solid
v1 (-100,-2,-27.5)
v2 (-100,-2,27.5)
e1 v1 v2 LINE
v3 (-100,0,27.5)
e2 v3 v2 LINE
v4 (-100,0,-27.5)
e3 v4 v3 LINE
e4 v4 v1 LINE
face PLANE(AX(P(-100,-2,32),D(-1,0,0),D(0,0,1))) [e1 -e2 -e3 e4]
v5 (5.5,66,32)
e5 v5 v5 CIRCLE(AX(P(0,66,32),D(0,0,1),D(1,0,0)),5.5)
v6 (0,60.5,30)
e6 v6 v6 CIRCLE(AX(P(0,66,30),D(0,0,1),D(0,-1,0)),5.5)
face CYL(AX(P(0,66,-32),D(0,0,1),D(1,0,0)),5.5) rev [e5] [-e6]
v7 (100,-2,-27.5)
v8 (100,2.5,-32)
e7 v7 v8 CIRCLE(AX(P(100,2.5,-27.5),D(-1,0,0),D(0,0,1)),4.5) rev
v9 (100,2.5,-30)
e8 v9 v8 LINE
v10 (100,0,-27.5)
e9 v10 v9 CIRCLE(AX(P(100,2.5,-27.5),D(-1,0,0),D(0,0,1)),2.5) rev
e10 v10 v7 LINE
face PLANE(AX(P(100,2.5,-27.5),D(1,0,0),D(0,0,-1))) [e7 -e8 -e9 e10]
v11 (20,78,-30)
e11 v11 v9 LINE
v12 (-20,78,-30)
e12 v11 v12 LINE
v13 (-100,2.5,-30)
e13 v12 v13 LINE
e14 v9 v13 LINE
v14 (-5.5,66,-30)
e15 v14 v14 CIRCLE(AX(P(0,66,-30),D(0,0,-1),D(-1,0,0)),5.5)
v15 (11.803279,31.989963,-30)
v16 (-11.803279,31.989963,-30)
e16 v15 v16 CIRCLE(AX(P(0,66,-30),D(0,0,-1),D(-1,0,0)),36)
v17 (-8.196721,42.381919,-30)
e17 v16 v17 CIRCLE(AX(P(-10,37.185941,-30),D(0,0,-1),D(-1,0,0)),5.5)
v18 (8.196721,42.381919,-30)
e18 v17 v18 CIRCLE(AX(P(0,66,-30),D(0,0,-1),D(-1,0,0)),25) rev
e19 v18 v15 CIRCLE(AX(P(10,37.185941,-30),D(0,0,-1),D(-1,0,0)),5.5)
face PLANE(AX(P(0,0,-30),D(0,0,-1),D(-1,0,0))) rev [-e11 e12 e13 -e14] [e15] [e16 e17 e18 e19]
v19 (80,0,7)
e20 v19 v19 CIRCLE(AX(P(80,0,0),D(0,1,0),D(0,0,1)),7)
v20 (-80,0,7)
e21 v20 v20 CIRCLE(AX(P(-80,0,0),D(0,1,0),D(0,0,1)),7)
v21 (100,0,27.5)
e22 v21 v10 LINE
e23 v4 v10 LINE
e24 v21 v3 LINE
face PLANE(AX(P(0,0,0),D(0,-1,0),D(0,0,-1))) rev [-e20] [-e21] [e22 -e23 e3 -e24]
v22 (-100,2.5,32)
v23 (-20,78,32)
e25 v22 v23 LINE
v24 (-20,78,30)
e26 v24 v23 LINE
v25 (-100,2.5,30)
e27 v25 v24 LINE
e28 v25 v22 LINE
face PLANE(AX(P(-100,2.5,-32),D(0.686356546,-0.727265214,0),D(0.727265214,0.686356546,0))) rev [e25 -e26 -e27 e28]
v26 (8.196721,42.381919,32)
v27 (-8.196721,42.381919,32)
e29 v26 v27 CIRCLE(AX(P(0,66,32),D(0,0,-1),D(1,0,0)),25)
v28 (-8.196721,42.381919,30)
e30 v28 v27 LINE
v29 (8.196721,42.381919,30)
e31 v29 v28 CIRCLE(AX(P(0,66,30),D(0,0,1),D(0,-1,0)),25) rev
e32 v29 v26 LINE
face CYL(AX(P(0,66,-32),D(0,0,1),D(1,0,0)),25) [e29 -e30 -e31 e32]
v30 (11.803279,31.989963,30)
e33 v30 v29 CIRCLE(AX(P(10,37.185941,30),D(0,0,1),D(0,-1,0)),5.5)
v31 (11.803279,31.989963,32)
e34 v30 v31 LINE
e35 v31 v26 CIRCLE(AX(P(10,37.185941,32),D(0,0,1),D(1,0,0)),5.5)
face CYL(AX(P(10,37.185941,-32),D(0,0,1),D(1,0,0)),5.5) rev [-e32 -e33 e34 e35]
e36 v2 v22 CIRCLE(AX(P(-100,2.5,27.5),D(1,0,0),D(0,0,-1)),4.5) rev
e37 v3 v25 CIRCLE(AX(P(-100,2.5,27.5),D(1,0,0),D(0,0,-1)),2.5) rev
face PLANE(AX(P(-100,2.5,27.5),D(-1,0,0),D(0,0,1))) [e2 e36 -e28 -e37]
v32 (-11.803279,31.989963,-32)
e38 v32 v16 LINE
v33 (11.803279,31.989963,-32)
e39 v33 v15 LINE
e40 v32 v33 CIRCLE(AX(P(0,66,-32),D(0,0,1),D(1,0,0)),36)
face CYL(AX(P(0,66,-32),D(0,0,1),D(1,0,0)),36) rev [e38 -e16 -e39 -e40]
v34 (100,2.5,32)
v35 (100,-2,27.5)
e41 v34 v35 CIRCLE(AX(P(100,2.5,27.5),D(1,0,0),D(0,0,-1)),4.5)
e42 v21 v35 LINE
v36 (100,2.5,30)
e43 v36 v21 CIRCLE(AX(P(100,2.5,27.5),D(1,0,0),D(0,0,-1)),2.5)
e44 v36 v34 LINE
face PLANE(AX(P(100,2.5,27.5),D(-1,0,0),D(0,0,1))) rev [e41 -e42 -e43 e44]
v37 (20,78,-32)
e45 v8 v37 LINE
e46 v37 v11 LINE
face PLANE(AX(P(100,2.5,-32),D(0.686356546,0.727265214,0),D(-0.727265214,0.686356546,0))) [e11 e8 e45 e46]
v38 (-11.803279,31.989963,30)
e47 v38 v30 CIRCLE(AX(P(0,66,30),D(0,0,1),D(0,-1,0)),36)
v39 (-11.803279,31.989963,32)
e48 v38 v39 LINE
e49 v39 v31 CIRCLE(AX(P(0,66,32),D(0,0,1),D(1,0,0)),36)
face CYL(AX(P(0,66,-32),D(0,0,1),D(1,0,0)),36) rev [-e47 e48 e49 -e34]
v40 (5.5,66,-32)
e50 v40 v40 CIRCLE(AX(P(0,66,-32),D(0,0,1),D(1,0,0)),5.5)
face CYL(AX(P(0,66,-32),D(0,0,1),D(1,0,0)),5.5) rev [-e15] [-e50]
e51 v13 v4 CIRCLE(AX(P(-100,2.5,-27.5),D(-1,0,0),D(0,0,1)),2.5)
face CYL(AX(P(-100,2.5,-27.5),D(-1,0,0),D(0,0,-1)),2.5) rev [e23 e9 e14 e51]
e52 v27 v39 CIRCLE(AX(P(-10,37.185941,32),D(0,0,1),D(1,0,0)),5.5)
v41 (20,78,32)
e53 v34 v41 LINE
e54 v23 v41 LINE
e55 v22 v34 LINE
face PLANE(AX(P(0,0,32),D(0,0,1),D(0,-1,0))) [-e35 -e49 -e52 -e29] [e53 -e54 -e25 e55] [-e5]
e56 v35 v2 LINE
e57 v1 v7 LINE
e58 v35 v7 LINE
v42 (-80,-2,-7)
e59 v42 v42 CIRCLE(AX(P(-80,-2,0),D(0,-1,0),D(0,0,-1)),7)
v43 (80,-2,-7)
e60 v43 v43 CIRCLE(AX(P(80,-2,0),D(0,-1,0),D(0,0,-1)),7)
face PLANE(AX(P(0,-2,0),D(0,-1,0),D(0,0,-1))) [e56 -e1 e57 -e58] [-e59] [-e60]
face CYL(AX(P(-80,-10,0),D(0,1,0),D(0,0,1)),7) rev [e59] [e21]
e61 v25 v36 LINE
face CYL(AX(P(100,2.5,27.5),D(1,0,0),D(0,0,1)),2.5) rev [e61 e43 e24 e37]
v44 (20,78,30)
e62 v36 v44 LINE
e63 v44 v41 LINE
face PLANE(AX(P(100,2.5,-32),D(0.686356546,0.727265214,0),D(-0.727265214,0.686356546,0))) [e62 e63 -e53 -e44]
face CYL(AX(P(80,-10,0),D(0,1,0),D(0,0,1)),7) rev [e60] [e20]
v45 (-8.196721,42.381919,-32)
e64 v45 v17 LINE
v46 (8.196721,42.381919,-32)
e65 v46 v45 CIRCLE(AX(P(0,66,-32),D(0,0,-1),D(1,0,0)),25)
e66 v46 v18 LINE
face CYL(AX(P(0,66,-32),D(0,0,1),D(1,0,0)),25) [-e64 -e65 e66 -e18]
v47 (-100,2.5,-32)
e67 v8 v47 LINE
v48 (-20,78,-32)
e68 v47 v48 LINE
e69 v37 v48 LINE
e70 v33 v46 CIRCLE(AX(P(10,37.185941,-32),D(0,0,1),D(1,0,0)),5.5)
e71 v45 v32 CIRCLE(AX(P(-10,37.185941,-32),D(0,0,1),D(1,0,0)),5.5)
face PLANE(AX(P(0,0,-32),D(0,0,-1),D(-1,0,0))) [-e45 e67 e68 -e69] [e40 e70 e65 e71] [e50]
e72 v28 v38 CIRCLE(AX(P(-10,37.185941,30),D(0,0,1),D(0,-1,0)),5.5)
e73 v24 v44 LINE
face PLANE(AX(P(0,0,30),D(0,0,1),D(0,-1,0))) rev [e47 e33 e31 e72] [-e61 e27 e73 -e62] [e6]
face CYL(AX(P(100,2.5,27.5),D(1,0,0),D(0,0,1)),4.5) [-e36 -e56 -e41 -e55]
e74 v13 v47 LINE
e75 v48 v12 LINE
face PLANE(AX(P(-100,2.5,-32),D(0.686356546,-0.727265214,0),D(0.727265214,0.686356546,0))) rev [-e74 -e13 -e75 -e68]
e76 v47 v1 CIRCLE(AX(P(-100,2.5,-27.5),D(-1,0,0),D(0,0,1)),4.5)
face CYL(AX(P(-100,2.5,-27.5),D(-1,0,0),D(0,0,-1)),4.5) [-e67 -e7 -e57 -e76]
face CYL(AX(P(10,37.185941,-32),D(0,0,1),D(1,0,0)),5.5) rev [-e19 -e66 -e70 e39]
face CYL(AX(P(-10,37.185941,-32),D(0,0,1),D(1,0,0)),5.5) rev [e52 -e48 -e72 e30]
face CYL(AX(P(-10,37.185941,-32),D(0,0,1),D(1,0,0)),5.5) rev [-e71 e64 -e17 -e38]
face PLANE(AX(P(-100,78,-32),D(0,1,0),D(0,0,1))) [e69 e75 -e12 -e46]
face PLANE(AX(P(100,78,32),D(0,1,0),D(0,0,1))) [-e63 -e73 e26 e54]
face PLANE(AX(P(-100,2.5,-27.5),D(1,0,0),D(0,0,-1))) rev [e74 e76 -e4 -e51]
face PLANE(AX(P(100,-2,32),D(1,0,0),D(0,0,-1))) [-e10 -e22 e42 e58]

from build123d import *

# Parameters (mm, degrees)
SKETCH9_W                      = 200
SKETCH9_H                      = 64
BASE_FLANGE2_DEPTH             = 2
EDGE_FLANGE2_STRIP_W           = 13
EDGE_FLANGE2_STRIP_H           = 2
EDGE_FLANGE2_STRIP_CUT_DEPTH   = 200
EDGE_FLANGE2_STRIP_2_W         = 13
EDGE_FLANGE2_STRIP_2_H         = 2
EDGE_FLANGE2_STRIP_CUT_2_DEPTH = 200
EDGE_FLANGE2_DEPTH             = 200
EDGE_FLANGE2_BEND_DEPTH        = 200
CUT_EXTRUDE1_DEPTH             = 143.056326857
SKETCH21_R                     = 5.5
CUT_EXTRUDE2_DEPTH             = 143.056326857
CUT_EXTRUDE3_DEPTH             = 143.056326857
SKETCH23_R                     = 7
CUT_EXTRUDE4_DEPTH             = 10


# Sheet-metal steps are written as plain solids
with BuildPart() as part:
    # Sketch9 → Base-Flange2 (new body)
    with BuildSketch(Plane(origin=(0, 0, 0), x_dir=(1, 0, 0), z_dir=(0, 1, 0))):
        Rectangle(SKETCH9_W, SKETCH9_H)
    extrude(amount=-BASE_FLANGE2_DEPTH)

    # Edge-Flange2 strip (across the edge) → Edge-Flange2 strip cut (cut)
    with BuildSketch(Plane(origin=(-100, 0, 32), x_dir=(0, 0, -1), z_dir=(1, 0, 0))):
        with Locations((-2, -1)):
            Rectangle(EDGE_FLANGE2_STRIP_W, EDGE_FLANGE2_STRIP_H)
    extrude(amount=EDGE_FLANGE2_STRIP_CUT_DEPTH, mode=Mode.SUBTRACT)

    # Edge-Flange2 strip 2 (across the edge) → Edge-Flange2 strip cut 2 (cut)
    with BuildSketch(Plane(origin=(100, 0, -32), x_dir=(0, 0, 1), z_dir=(-1, 0, 0))):
        with Locations((-2, -1)):
            Rectangle(EDGE_FLANGE2_STRIP_2_W, EDGE_FLANGE2_STRIP_2_H)
    extrude(amount=EDGE_FLANGE2_STRIP_CUT_2_DEPTH, mode=Mode.SUBTRACT)

    # Edge-Flange2 section (across the edge) → Edge-Flange2 (add)
    with BuildSketch(Plane(origin=(-100, 0, 32), x_dir=(0, 0, -1), z_dir=(1, 0, 0))):
        with BuildLine():
            Line((0, 2.5), (0, 78))
            Line((0, 78), (2, 78))
            Line((2, 78), (2, 2.5))
            ThreePointArc((2, 2.5), (2.732233047, 0.732233047), (4.5, 0))
            Line((4.5, 0), (4.5, -2))
            ThreePointArc((4.5, -2), (1.318019485, -0.681980515), (0, 2.5))
        make_face()
    extrude(amount=EDGE_FLANGE2_DEPTH)

    # Edge-Flange2 section 2 (across the edge) → Edge-Flange2 bend (add)
    with BuildSketch(Plane(origin=(100, 0, -32), x_dir=(0, 0, 1), z_dir=(-1, 0, 0))):
        with BuildLine():
            Line((0, 2.5), (0, 78))
            Line((0, 78), (2, 78))
            Line((2, 78), (2, 2.5))
            ThreePointArc((2, 2.5), (2.732233047, 0.732233047), (4.5, 0))
            Line((4.5, 0), (4.5, -2))
            ThreePointArc((4.5, -2), (1.318019485, -0.681980515), (0, 2.5))
        make_face()
    extrude(amount=EDGE_FLANGE2_BEND_DEPTH)

    # Sketch20 → Cut-Extrude1 (cut, through all)
    with BuildSketch(Plane.XY.offset(32)):
        Polygon((-100, 2.5), (-20, 78), (-100, 78), align=None)
    cut_extrude1 = extrude(amount=-CUT_EXTRUDE1_DEPTH, mode=Mode.SUBTRACT)

    # Mirror1: Cut-Extrude1 across plane
    add(cut_extrude1.mirror(Plane(origin=(0, 0, 0), x_dir=(0, 0, 1), z_dir=(1, 0, 0))), mode=Mode.SUBTRACT)

    # Sketch21 → Cut-Extrude2 (cut, through all)
    with BuildSketch(Plane.XY.offset(32)):
        with Locations((0, 66)):
            Circle(SKETCH21_R)
    extrude(amount=-CUT_EXTRUDE2_DEPTH, mode=Mode.SUBTRACT)

    # Sketch22 → Cut-Extrude3 (cut, through all)
    with BuildSketch(Plane.XY.offset(32)):
        with BuildLine():
            ThreePointArc((-11.803278689, 31.989963067), (0, 30), (11.803278689, 31.989963067))
            ThreePointArc((11.803278689, 31.989963067), (15.195977865, 38.98921962), (8.196721311, 42.381918796))
            ThreePointArc((8.196721311, 42.381918796), (0, 41), (-8.196721311, 42.381918796))
            ThreePointArc((-8.196721311, 42.381918796), (-15.195977865, 38.98921962), (-11.803278689, 31.989963067))
        make_face()
    extrude(amount=-CUT_EXTRUDE3_DEPTH, mode=Mode.SUBTRACT)

    # Sketch23 → Cut-Extrude4 (cut)
    with BuildSketch(Plane(origin=(0, 0, 0), x_dir=(1, 0, 0), z_dir=(0, 1, 0))):
        with Locations(Location((-80, 0, 0), (0, 0, 270))):
            Circle(SKETCH23_R)
        with Locations(Location((80, 0, 0), (0, 0, 270))):
            Circle(SKETCH23_R)
    extrude(amount=-CUT_EXTRUDE4_DEPTH, mode=Mode.SUBTRACT)


solid = part.part
